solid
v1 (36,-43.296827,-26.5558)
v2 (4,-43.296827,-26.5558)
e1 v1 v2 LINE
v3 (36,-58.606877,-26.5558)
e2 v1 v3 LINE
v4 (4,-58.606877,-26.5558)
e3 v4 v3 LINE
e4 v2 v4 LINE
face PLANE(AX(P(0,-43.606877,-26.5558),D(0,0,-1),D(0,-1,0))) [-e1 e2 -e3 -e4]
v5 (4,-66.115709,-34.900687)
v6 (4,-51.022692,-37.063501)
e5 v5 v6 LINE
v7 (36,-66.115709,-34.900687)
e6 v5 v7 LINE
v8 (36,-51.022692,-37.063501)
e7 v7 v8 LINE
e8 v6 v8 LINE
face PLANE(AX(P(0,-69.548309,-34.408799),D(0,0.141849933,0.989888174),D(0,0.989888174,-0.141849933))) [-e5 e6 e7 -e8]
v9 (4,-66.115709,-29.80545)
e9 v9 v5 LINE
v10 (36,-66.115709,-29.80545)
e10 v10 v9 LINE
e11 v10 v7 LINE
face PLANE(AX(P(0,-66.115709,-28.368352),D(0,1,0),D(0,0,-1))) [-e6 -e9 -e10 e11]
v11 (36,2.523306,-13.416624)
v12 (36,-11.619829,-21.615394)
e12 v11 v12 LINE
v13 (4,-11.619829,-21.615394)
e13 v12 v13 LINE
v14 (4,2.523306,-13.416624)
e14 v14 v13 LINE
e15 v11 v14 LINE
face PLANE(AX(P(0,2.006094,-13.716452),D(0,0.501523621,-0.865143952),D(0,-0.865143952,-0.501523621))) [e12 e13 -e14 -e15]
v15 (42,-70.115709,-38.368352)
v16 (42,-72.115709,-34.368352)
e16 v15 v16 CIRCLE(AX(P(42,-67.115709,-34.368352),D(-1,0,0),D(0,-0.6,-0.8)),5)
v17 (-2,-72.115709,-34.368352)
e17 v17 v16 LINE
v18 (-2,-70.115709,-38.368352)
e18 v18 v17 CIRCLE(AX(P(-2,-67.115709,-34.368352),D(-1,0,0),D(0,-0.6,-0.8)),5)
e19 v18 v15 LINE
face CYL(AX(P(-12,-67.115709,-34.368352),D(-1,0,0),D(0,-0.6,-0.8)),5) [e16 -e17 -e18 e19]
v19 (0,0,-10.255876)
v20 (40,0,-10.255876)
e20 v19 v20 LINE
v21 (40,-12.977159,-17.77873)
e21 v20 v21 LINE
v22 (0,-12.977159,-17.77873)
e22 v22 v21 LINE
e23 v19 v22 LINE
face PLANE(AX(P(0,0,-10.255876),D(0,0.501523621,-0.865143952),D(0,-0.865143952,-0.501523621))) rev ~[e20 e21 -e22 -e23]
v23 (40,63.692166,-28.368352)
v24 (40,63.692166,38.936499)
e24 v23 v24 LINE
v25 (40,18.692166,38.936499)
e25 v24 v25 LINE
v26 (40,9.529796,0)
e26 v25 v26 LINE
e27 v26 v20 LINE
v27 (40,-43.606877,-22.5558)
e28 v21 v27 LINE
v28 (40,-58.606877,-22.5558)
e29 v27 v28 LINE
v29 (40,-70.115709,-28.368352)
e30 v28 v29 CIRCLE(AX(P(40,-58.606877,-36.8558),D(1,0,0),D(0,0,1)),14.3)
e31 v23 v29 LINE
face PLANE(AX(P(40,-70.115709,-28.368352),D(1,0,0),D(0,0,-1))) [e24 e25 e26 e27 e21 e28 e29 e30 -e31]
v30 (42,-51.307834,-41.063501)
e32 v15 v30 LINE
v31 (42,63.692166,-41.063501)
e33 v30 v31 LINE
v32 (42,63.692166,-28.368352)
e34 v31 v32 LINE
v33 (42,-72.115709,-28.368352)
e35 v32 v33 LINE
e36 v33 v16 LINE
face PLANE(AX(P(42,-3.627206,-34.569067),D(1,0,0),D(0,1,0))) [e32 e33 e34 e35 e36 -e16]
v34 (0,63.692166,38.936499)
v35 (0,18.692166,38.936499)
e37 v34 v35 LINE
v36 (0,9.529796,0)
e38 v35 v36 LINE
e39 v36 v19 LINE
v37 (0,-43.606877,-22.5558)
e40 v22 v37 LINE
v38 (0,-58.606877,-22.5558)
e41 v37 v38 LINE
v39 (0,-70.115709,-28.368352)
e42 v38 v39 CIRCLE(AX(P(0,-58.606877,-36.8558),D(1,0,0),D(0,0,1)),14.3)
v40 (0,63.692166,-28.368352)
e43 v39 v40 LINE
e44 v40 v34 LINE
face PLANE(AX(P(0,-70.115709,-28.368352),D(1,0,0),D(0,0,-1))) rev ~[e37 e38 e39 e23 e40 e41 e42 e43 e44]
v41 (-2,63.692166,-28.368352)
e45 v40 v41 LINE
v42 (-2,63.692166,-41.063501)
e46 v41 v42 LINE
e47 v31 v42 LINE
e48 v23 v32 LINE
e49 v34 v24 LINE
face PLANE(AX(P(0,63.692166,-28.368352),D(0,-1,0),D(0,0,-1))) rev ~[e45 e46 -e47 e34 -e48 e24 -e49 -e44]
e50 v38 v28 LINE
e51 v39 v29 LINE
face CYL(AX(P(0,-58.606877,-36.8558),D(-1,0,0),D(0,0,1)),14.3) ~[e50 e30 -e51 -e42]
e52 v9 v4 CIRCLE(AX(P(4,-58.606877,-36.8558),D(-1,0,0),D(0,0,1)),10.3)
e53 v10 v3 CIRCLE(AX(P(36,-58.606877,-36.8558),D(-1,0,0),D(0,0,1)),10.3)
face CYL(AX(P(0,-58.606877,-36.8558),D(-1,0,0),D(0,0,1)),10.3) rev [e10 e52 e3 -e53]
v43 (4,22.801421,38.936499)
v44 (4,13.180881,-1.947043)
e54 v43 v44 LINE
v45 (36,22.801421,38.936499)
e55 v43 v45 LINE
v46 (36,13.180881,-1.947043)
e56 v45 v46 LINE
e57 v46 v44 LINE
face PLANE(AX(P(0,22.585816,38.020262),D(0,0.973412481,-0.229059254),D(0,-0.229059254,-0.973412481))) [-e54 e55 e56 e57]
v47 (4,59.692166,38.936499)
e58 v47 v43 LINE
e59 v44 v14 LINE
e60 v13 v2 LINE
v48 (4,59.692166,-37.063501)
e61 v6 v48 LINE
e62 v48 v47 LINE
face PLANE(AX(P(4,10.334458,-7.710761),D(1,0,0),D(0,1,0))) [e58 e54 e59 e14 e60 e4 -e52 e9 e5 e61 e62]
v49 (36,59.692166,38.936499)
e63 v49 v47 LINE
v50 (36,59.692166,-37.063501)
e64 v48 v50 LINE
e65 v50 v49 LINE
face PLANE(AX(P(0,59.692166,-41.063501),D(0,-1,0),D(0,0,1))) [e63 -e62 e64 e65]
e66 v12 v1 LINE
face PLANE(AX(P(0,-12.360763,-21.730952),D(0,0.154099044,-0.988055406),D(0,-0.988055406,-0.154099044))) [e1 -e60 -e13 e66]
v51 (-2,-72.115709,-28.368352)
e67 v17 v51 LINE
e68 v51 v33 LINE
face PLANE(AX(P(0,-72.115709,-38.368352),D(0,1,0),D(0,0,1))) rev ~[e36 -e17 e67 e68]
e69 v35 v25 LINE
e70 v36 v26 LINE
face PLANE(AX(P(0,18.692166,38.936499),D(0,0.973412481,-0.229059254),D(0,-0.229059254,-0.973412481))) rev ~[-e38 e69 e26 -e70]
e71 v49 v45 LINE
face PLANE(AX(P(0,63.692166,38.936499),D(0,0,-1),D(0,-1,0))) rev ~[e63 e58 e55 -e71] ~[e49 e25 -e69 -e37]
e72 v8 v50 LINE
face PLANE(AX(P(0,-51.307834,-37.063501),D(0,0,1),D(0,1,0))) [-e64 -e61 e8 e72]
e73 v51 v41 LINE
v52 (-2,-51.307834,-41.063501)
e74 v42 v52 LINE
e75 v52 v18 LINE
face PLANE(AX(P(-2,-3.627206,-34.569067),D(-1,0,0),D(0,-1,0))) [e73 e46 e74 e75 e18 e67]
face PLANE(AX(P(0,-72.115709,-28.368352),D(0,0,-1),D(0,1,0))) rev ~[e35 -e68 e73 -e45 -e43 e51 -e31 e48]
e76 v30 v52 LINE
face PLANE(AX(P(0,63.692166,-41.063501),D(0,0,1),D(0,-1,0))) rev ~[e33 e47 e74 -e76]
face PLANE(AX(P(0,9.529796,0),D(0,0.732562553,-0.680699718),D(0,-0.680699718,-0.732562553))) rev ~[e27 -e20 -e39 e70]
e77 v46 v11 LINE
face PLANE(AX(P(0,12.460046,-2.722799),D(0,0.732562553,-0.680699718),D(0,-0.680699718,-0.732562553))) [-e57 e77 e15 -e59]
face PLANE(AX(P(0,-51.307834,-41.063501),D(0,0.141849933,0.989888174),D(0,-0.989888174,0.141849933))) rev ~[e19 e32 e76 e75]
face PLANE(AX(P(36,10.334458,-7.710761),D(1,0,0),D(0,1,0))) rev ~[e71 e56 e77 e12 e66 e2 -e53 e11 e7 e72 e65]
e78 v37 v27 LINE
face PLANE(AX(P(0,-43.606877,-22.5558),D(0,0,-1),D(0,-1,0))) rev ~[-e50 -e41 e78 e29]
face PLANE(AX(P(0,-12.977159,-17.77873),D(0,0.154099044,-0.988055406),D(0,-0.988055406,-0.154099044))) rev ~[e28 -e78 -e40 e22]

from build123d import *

# Parameters (mm, degrees)
F0_R        = 11
F0_R_2      = 8.5
F1_DEPTH    = 40
F2_T        = -4
F3_DEPTH    = 2
F5_DEPTH    = 2
F7_DEPTH    = 2
F8_T1_DEPTH = 64


# Not quite as in the source:
# - a fillet or chamfer that OpenCascade refuses, or shapes differently, is made with other operations: its cross-section is extruded or revolved along the edge and cut away or added


with BuildPart() as f1:
    # F0 (on Right) → F1 (new body)
    with BuildSketch(Plane.YZ):
        with BuildLine():
            Line((63.6921661989, -31.096493093), (63.6921661989, 38.9364992437))
            Line((63.6921661989, 38.9364992437), (18.6921661989, 38.9364992437))
            Line((18.6921661989, 38.9364992437), (9.5297960554, 0))
            Line((9.5297960554, 0), (0, -10.2558757374))
            Line((0, -10.2558757374), (-12.9771592787, -17.7787300531))
            Line((-12.9771592787, -17.7787300531), (-43.6068768529, -22.555800424))
            Line((-43.6068768529, -22.555800424), (-58.6068768529, -22.555800424))
            ThreePointArc((-58.6068768529, -22.555800424), (-65.0535615803, -24.0913867663), (-70.115709102, -28.3683520288))
            Line((-70.115709102, -28.3683520288), (-51.312591107, -31.096493093))
            Line((-51.312591107, -31.096493093), (63.6921661989, -31.096493093))
        make_face()
        with Locations((47.8400811553, 10.7847582549)):
            Circle(F0_R, mode=Mode.SUBTRACT)
        Polygon((63.6921661989, -41.0635007563), (63.6921661989, -31.096493093), (-51.312591107, -31.096493093), (-70.115709102, -28.3683520288), (-70.115709102, -38.3683520288), (-51.3078338011, -41.0635007563), align=None)
        with Locations((47.8400811553, 10.7847582549)):
            Circle(F0_R)
        with Locations((47.8400811553, 10.7847582549)):
            Circle(F0_R_2, mode=Mode.SUBTRACT)
        with Locations((47.8400811553, 10.7847582549)):
            Circle(F0_R_2)
    extrude(amount=F1_DEPTH)

    # F2
    f2_openings = [f1.faces().sort_by_distance(p)[0] for p in [
        (20, 41.192166, 38.936499),
    ]]
    offset(amount=F2_T, openings=f2_openings, kind=Kind.INTERSECTION)

    # F3 (add): a face of the model
    f3_faces = [f1.faces().sort_by_distance(p)[0] for p in [
        (20, -70.115709102, -33.3683520288),
    ]]
    extrude(f3_faces, amount=F3_DEPTH)

    # F4 (on face) → F5 (join)
    with BuildSketch(Plane.YZ.offset(40)):
        Polygon((63.6921661989, -28.3683520288), (-70.115709102, -28.3683520288), (-72.115709102, -28.3683520288), (-72.115709102, -38.3683520288), (-70.115709102, -38.3683520288), (-51.3078338011, -41.0635007563), (63.6921661989, -41.0635007563), align=None)
    extrude(amount=F5_DEPTH)

    # F6 (on face) → F7 (join)
    with BuildSketch(Plane(origin=(0, 0, 0), x_dir=(0, -1, 0), z_dir=(-1, 0, 0))):
        Polygon((72.115709102, -28.3683520288), (70.115709102, -28.3683520288), (-63.6921661989, -28.3683520288), (-63.6921661989, -41.0635007563), (51.3078338011, -41.0635007563), (70.115709102, -38.3683520288), (72.115709102, -38.3683520288), align=None)
    extrude(amount=F7_DEPTH)

    # F8: fillet of radius 5 on 1 edges, made by hand

    # F8_s2 → F8_t1 (cut)
    with BuildSketch(Plane.YZ.offset(-12)):
        with BuildLine():
            ThreePointArc((-70.115709102, -38.3683520288), (-71.587845057, -36.6044200063), (-72.115709102, -34.3683520288))
            Line((-72.115709102, -34.3683520288), (-72.115709102, -38.3683520288))
            Line((-72.115709102, -38.3683520288), (-70.115709102, -38.3683520288))
        make_face()
    extrude(amount=F8_T1_DEPTH, mode=Mode.SUBTRACT)


solid = f1.part
